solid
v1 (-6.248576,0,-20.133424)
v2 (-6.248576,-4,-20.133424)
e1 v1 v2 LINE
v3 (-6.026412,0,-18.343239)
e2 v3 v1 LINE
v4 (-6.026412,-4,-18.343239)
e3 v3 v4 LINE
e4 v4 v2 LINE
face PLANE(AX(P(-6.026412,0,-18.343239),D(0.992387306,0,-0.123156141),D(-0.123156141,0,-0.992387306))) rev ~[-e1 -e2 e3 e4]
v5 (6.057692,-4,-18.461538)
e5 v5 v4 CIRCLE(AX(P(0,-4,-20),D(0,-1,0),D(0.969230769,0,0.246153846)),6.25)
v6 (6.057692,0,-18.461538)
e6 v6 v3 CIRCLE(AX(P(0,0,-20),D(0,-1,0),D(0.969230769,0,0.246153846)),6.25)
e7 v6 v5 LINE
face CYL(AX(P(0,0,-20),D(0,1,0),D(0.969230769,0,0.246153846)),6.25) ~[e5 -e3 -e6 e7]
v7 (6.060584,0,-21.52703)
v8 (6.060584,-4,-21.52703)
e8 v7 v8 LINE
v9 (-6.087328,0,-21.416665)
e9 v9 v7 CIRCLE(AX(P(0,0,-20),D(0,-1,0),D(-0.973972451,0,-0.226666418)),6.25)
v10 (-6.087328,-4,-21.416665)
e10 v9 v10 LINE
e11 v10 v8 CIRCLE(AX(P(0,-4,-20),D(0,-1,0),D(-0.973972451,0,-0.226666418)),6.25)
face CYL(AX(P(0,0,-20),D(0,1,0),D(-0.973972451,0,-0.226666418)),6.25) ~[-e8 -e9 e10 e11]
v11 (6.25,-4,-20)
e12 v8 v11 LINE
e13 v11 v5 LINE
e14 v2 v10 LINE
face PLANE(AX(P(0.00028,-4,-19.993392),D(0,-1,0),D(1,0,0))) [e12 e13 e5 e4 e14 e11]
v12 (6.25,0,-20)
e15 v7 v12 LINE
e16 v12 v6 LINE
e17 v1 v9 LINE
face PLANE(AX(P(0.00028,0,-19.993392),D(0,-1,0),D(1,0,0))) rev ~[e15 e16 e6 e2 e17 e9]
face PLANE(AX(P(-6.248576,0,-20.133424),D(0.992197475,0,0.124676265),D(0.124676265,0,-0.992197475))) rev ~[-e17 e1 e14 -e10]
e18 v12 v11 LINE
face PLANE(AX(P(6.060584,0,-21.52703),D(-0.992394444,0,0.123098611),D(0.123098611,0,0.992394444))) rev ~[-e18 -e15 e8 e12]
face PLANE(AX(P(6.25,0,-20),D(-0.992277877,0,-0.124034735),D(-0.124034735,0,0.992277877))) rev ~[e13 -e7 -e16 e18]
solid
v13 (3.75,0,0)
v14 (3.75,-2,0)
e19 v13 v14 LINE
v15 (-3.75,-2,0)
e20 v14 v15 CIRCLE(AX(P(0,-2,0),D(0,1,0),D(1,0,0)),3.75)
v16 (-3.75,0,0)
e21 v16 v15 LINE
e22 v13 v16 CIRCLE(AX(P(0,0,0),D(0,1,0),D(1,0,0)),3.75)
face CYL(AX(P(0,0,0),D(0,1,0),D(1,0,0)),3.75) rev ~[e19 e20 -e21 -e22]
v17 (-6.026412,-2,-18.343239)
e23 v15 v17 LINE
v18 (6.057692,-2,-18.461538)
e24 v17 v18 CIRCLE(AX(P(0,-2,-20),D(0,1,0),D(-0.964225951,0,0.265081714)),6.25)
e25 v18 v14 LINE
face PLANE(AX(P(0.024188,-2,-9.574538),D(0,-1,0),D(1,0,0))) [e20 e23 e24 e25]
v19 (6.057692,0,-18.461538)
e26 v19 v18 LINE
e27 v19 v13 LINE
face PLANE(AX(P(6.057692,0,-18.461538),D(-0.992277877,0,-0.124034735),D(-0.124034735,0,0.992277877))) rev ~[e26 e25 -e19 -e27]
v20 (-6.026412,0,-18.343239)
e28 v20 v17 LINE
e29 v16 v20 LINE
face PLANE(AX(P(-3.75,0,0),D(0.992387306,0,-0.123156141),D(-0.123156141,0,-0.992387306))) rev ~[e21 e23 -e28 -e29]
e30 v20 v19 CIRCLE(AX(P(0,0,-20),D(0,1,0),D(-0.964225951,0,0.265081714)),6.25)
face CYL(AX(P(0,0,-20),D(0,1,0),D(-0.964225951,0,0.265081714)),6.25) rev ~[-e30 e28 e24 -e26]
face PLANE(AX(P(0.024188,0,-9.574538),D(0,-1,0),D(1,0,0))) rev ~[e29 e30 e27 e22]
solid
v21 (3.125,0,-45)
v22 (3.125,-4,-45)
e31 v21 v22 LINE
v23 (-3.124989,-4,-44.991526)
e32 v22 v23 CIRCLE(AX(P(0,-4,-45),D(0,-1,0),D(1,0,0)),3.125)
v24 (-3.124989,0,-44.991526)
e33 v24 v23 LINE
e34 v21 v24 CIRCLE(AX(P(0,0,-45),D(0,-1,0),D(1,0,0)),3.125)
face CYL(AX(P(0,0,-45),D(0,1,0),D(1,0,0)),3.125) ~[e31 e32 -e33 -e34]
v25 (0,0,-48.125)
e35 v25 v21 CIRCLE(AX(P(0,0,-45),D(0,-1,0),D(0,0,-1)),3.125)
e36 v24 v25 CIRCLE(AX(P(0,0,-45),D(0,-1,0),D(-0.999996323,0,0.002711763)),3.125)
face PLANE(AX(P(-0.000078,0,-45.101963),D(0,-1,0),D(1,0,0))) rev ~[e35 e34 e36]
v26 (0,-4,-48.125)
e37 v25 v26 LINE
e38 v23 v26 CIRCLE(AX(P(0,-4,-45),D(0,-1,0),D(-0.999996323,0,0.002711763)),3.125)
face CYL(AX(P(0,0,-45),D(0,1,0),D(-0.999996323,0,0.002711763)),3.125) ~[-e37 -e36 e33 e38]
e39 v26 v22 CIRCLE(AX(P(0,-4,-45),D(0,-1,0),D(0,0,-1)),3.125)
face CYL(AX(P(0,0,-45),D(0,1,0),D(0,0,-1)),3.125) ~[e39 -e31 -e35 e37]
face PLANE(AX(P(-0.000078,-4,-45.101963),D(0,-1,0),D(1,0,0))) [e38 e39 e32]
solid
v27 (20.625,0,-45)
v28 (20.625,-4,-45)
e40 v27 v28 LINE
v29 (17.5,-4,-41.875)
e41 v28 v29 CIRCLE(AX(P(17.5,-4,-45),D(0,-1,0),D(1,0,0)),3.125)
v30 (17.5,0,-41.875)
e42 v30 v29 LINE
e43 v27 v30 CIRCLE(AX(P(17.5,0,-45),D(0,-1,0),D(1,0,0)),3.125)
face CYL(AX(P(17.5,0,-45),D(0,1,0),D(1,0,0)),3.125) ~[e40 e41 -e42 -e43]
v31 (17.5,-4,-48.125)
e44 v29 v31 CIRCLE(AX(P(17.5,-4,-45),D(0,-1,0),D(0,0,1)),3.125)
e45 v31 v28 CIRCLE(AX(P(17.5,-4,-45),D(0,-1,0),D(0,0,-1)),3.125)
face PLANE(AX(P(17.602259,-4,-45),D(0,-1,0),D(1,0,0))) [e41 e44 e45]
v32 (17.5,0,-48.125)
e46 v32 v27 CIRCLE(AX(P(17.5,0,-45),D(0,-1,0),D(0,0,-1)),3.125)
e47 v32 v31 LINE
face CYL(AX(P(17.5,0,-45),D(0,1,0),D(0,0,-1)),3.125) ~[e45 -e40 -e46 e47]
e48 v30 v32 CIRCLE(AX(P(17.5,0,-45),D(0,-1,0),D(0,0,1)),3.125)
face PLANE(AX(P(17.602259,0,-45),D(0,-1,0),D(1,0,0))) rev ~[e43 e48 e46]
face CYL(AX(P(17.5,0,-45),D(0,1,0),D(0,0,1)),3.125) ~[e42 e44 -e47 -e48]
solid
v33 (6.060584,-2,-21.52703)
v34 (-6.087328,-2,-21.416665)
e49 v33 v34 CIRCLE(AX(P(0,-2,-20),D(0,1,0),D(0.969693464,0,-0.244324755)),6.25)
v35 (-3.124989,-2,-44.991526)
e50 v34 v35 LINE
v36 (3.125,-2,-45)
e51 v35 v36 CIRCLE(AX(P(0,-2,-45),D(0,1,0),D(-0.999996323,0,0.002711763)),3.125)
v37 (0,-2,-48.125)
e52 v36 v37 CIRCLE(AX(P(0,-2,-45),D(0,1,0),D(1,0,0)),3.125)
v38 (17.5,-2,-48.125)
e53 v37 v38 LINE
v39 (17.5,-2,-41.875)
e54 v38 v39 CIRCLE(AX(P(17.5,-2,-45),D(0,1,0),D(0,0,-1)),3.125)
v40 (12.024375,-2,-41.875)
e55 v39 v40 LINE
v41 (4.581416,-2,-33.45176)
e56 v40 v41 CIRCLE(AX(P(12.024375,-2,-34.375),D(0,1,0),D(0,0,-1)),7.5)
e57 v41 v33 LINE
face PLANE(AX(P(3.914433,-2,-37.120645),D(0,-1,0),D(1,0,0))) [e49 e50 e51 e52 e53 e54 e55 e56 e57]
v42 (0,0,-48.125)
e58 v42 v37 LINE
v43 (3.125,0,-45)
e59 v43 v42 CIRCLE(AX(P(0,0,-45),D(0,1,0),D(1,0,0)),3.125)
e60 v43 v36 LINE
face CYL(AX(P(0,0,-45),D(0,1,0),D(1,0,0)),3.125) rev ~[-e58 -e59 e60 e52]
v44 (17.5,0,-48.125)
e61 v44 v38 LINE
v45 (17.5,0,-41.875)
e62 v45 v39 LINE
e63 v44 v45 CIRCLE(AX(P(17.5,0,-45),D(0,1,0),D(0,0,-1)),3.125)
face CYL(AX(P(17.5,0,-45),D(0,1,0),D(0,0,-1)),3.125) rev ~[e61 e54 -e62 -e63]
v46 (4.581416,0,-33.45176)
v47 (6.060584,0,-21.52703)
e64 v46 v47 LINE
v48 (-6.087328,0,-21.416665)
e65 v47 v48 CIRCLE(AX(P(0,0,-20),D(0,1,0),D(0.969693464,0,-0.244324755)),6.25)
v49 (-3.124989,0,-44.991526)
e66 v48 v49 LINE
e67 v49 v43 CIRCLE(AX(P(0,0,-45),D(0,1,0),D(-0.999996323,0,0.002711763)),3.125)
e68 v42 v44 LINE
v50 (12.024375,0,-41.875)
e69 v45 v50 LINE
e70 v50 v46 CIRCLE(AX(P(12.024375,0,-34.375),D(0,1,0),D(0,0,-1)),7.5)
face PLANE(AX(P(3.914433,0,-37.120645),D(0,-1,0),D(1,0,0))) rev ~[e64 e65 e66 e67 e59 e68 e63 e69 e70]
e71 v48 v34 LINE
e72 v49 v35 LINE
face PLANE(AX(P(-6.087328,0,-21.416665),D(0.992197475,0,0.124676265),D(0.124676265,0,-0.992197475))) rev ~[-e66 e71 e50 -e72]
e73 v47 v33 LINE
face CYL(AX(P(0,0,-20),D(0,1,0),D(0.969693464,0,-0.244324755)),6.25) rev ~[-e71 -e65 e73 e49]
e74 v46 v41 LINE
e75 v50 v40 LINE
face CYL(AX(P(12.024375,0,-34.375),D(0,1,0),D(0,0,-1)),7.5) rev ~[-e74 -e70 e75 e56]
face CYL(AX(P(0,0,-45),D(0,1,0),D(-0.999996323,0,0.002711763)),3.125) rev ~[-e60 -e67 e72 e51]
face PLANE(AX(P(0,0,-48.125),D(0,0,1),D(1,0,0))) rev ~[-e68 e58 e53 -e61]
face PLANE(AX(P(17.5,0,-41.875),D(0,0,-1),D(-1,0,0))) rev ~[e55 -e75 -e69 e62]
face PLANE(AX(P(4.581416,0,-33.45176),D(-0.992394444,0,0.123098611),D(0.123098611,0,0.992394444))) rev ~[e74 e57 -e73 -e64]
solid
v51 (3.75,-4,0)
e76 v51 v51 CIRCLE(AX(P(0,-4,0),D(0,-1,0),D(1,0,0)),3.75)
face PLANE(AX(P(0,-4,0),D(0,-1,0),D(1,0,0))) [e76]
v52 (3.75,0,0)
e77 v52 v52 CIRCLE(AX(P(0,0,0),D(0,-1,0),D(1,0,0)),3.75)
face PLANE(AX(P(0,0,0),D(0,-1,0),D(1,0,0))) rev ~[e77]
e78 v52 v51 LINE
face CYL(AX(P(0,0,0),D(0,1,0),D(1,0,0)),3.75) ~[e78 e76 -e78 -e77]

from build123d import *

# Parameters (mm, degrees)
F1_DEPTH = 2
F2_DEPTH = 4


with BuildPart() as f1:
    # F0 (on Front) → F1 (new body)
    with BuildSketch(Plane.XZ):
        with BuildLine():
            Line((6.0576923077, -18.4615384615), (3.75, 0))
            ThreePointArc((3.75, 0), (0, -3.75), (-3.75, 0))
            Line((-3.75, 0), (-6.0264121951, -18.3432392886))
            ThreePointArc((-6.0264121951, -18.3432392886), (0.0611823908, -13.75029947), (6.0576923077, -18.4615384615))
        make_face()
    extrude(amount=F1_DEPTH)


with BuildPart() as f1b:
    # F0 (on Front) → F1, piece 2 (new body)
    with BuildSketch(Plane.XZ):
        with BuildLine():
            Line((4.581416472, -33.451760418), (6.0605841498, -21.5270297191))
            ThreePointArc((6.0605841498, -21.5270297191), (-0.0567793323, -26.2497420833), (-6.0873278177, -21.416665112))
            Line((-6.0873278177, -21.416665112), (-3.1249885099, -44.9915257414))
            ThreePointArc((-3.1249885099, -44.9915257414), (0.0042371332, -41.8750028725), (3.125, -45))
            ThreePointArc((3.125, -45), (2.2097086912, -47.2097086912), (0, -48.125))
            Line((0, -48.125), (17.5, -48.125))
            ThreePointArc((17.5, -48.125), (14.375, -45), (17.5, -41.875))
            Line((17.5, -41.875), (12.0243748001, -41.875))
            ThreePointArc((12.0243748001, -41.875), (6.404130283, -39.3411707147), (4.581416472, -33.451760418))
        make_face()
    extrude(amount=F1_DEPTH)


with BuildPart() as f2:
    # F0 (on Front) → F2 (new body)
    with BuildSketch(Plane.XZ):
        with BuildLine():
            ThreePointArc((-3.75, 0), (0, -3.75), (3.75, 0))
            ThreePointArc((3.75, 0), (0, 3.75), (-3.75, 0))
        make_face()
    extrude(amount=F2_DEPTH)


with BuildPart() as f2b:
    # F0 (on Front) → F2, piece 2 (new body)
    with BuildSketch(Plane.XZ):
        with BuildLine():
            Line((6.25, -20), (6.0576923077, -18.4615384615))
            ThreePointArc((6.0576923077, -18.4615384615), (0.0611823908, -13.75029947), (-6.0264121951, -18.3432392886))
            Line((-6.0264121951, -18.3432392886), (-6.2485756833, -20.1334238753))
            Line((-6.2485756833, -20.1334238753), (-6.0873278177, -21.416665112))
            ThreePointArc((-6.0873278177, -21.416665112), (-0.0567793323, -26.2497420833), (6.0605841498, -21.5270297191))
            Line((6.0605841498, -21.5270297191), (6.25, -20))
        make_face()
    extrude(amount=F2_DEPTH)


with BuildPart() as f2c:
    # F0 (on Front) → F2, piece 3 (new body)
    with BuildSketch(Plane.XZ):
        with BuildLine():
            ThreePointArc((3.125, -45), (0.0042371332, -41.8750028725), (-3.1249885099, -44.9915257414))
            ThreePointArc((-3.1249885099, -44.9915257414), (-2.2127027657, -47.2067105544), (0, -48.125))
            ThreePointArc((0, -48.125), (2.2097086912, -47.2097086912), (3.125, -45))
        make_face()
    extrude(amount=F2_DEPTH)


with BuildPart() as f2d:
    # F0 (on Front) → F2, piece 4 (new body)
    with BuildSketch(Plane.XZ):
        with BuildLine():
            ThreePointArc((20.625, -45), (19.7097086912, -42.7902913088), (17.5, -41.875))
            ThreePointArc((17.5, -41.875), (14.375, -45), (17.5, -48.125))
            ThreePointArc((17.5, -48.125), (19.7097086912, -47.2097086912), (20.625, -45))
        make_face()
    extrude(amount=F2_DEPTH)


solid = Compound([f1.part, f1b.part, f2.part, f2b.part, f2c.part, f2d.part])
